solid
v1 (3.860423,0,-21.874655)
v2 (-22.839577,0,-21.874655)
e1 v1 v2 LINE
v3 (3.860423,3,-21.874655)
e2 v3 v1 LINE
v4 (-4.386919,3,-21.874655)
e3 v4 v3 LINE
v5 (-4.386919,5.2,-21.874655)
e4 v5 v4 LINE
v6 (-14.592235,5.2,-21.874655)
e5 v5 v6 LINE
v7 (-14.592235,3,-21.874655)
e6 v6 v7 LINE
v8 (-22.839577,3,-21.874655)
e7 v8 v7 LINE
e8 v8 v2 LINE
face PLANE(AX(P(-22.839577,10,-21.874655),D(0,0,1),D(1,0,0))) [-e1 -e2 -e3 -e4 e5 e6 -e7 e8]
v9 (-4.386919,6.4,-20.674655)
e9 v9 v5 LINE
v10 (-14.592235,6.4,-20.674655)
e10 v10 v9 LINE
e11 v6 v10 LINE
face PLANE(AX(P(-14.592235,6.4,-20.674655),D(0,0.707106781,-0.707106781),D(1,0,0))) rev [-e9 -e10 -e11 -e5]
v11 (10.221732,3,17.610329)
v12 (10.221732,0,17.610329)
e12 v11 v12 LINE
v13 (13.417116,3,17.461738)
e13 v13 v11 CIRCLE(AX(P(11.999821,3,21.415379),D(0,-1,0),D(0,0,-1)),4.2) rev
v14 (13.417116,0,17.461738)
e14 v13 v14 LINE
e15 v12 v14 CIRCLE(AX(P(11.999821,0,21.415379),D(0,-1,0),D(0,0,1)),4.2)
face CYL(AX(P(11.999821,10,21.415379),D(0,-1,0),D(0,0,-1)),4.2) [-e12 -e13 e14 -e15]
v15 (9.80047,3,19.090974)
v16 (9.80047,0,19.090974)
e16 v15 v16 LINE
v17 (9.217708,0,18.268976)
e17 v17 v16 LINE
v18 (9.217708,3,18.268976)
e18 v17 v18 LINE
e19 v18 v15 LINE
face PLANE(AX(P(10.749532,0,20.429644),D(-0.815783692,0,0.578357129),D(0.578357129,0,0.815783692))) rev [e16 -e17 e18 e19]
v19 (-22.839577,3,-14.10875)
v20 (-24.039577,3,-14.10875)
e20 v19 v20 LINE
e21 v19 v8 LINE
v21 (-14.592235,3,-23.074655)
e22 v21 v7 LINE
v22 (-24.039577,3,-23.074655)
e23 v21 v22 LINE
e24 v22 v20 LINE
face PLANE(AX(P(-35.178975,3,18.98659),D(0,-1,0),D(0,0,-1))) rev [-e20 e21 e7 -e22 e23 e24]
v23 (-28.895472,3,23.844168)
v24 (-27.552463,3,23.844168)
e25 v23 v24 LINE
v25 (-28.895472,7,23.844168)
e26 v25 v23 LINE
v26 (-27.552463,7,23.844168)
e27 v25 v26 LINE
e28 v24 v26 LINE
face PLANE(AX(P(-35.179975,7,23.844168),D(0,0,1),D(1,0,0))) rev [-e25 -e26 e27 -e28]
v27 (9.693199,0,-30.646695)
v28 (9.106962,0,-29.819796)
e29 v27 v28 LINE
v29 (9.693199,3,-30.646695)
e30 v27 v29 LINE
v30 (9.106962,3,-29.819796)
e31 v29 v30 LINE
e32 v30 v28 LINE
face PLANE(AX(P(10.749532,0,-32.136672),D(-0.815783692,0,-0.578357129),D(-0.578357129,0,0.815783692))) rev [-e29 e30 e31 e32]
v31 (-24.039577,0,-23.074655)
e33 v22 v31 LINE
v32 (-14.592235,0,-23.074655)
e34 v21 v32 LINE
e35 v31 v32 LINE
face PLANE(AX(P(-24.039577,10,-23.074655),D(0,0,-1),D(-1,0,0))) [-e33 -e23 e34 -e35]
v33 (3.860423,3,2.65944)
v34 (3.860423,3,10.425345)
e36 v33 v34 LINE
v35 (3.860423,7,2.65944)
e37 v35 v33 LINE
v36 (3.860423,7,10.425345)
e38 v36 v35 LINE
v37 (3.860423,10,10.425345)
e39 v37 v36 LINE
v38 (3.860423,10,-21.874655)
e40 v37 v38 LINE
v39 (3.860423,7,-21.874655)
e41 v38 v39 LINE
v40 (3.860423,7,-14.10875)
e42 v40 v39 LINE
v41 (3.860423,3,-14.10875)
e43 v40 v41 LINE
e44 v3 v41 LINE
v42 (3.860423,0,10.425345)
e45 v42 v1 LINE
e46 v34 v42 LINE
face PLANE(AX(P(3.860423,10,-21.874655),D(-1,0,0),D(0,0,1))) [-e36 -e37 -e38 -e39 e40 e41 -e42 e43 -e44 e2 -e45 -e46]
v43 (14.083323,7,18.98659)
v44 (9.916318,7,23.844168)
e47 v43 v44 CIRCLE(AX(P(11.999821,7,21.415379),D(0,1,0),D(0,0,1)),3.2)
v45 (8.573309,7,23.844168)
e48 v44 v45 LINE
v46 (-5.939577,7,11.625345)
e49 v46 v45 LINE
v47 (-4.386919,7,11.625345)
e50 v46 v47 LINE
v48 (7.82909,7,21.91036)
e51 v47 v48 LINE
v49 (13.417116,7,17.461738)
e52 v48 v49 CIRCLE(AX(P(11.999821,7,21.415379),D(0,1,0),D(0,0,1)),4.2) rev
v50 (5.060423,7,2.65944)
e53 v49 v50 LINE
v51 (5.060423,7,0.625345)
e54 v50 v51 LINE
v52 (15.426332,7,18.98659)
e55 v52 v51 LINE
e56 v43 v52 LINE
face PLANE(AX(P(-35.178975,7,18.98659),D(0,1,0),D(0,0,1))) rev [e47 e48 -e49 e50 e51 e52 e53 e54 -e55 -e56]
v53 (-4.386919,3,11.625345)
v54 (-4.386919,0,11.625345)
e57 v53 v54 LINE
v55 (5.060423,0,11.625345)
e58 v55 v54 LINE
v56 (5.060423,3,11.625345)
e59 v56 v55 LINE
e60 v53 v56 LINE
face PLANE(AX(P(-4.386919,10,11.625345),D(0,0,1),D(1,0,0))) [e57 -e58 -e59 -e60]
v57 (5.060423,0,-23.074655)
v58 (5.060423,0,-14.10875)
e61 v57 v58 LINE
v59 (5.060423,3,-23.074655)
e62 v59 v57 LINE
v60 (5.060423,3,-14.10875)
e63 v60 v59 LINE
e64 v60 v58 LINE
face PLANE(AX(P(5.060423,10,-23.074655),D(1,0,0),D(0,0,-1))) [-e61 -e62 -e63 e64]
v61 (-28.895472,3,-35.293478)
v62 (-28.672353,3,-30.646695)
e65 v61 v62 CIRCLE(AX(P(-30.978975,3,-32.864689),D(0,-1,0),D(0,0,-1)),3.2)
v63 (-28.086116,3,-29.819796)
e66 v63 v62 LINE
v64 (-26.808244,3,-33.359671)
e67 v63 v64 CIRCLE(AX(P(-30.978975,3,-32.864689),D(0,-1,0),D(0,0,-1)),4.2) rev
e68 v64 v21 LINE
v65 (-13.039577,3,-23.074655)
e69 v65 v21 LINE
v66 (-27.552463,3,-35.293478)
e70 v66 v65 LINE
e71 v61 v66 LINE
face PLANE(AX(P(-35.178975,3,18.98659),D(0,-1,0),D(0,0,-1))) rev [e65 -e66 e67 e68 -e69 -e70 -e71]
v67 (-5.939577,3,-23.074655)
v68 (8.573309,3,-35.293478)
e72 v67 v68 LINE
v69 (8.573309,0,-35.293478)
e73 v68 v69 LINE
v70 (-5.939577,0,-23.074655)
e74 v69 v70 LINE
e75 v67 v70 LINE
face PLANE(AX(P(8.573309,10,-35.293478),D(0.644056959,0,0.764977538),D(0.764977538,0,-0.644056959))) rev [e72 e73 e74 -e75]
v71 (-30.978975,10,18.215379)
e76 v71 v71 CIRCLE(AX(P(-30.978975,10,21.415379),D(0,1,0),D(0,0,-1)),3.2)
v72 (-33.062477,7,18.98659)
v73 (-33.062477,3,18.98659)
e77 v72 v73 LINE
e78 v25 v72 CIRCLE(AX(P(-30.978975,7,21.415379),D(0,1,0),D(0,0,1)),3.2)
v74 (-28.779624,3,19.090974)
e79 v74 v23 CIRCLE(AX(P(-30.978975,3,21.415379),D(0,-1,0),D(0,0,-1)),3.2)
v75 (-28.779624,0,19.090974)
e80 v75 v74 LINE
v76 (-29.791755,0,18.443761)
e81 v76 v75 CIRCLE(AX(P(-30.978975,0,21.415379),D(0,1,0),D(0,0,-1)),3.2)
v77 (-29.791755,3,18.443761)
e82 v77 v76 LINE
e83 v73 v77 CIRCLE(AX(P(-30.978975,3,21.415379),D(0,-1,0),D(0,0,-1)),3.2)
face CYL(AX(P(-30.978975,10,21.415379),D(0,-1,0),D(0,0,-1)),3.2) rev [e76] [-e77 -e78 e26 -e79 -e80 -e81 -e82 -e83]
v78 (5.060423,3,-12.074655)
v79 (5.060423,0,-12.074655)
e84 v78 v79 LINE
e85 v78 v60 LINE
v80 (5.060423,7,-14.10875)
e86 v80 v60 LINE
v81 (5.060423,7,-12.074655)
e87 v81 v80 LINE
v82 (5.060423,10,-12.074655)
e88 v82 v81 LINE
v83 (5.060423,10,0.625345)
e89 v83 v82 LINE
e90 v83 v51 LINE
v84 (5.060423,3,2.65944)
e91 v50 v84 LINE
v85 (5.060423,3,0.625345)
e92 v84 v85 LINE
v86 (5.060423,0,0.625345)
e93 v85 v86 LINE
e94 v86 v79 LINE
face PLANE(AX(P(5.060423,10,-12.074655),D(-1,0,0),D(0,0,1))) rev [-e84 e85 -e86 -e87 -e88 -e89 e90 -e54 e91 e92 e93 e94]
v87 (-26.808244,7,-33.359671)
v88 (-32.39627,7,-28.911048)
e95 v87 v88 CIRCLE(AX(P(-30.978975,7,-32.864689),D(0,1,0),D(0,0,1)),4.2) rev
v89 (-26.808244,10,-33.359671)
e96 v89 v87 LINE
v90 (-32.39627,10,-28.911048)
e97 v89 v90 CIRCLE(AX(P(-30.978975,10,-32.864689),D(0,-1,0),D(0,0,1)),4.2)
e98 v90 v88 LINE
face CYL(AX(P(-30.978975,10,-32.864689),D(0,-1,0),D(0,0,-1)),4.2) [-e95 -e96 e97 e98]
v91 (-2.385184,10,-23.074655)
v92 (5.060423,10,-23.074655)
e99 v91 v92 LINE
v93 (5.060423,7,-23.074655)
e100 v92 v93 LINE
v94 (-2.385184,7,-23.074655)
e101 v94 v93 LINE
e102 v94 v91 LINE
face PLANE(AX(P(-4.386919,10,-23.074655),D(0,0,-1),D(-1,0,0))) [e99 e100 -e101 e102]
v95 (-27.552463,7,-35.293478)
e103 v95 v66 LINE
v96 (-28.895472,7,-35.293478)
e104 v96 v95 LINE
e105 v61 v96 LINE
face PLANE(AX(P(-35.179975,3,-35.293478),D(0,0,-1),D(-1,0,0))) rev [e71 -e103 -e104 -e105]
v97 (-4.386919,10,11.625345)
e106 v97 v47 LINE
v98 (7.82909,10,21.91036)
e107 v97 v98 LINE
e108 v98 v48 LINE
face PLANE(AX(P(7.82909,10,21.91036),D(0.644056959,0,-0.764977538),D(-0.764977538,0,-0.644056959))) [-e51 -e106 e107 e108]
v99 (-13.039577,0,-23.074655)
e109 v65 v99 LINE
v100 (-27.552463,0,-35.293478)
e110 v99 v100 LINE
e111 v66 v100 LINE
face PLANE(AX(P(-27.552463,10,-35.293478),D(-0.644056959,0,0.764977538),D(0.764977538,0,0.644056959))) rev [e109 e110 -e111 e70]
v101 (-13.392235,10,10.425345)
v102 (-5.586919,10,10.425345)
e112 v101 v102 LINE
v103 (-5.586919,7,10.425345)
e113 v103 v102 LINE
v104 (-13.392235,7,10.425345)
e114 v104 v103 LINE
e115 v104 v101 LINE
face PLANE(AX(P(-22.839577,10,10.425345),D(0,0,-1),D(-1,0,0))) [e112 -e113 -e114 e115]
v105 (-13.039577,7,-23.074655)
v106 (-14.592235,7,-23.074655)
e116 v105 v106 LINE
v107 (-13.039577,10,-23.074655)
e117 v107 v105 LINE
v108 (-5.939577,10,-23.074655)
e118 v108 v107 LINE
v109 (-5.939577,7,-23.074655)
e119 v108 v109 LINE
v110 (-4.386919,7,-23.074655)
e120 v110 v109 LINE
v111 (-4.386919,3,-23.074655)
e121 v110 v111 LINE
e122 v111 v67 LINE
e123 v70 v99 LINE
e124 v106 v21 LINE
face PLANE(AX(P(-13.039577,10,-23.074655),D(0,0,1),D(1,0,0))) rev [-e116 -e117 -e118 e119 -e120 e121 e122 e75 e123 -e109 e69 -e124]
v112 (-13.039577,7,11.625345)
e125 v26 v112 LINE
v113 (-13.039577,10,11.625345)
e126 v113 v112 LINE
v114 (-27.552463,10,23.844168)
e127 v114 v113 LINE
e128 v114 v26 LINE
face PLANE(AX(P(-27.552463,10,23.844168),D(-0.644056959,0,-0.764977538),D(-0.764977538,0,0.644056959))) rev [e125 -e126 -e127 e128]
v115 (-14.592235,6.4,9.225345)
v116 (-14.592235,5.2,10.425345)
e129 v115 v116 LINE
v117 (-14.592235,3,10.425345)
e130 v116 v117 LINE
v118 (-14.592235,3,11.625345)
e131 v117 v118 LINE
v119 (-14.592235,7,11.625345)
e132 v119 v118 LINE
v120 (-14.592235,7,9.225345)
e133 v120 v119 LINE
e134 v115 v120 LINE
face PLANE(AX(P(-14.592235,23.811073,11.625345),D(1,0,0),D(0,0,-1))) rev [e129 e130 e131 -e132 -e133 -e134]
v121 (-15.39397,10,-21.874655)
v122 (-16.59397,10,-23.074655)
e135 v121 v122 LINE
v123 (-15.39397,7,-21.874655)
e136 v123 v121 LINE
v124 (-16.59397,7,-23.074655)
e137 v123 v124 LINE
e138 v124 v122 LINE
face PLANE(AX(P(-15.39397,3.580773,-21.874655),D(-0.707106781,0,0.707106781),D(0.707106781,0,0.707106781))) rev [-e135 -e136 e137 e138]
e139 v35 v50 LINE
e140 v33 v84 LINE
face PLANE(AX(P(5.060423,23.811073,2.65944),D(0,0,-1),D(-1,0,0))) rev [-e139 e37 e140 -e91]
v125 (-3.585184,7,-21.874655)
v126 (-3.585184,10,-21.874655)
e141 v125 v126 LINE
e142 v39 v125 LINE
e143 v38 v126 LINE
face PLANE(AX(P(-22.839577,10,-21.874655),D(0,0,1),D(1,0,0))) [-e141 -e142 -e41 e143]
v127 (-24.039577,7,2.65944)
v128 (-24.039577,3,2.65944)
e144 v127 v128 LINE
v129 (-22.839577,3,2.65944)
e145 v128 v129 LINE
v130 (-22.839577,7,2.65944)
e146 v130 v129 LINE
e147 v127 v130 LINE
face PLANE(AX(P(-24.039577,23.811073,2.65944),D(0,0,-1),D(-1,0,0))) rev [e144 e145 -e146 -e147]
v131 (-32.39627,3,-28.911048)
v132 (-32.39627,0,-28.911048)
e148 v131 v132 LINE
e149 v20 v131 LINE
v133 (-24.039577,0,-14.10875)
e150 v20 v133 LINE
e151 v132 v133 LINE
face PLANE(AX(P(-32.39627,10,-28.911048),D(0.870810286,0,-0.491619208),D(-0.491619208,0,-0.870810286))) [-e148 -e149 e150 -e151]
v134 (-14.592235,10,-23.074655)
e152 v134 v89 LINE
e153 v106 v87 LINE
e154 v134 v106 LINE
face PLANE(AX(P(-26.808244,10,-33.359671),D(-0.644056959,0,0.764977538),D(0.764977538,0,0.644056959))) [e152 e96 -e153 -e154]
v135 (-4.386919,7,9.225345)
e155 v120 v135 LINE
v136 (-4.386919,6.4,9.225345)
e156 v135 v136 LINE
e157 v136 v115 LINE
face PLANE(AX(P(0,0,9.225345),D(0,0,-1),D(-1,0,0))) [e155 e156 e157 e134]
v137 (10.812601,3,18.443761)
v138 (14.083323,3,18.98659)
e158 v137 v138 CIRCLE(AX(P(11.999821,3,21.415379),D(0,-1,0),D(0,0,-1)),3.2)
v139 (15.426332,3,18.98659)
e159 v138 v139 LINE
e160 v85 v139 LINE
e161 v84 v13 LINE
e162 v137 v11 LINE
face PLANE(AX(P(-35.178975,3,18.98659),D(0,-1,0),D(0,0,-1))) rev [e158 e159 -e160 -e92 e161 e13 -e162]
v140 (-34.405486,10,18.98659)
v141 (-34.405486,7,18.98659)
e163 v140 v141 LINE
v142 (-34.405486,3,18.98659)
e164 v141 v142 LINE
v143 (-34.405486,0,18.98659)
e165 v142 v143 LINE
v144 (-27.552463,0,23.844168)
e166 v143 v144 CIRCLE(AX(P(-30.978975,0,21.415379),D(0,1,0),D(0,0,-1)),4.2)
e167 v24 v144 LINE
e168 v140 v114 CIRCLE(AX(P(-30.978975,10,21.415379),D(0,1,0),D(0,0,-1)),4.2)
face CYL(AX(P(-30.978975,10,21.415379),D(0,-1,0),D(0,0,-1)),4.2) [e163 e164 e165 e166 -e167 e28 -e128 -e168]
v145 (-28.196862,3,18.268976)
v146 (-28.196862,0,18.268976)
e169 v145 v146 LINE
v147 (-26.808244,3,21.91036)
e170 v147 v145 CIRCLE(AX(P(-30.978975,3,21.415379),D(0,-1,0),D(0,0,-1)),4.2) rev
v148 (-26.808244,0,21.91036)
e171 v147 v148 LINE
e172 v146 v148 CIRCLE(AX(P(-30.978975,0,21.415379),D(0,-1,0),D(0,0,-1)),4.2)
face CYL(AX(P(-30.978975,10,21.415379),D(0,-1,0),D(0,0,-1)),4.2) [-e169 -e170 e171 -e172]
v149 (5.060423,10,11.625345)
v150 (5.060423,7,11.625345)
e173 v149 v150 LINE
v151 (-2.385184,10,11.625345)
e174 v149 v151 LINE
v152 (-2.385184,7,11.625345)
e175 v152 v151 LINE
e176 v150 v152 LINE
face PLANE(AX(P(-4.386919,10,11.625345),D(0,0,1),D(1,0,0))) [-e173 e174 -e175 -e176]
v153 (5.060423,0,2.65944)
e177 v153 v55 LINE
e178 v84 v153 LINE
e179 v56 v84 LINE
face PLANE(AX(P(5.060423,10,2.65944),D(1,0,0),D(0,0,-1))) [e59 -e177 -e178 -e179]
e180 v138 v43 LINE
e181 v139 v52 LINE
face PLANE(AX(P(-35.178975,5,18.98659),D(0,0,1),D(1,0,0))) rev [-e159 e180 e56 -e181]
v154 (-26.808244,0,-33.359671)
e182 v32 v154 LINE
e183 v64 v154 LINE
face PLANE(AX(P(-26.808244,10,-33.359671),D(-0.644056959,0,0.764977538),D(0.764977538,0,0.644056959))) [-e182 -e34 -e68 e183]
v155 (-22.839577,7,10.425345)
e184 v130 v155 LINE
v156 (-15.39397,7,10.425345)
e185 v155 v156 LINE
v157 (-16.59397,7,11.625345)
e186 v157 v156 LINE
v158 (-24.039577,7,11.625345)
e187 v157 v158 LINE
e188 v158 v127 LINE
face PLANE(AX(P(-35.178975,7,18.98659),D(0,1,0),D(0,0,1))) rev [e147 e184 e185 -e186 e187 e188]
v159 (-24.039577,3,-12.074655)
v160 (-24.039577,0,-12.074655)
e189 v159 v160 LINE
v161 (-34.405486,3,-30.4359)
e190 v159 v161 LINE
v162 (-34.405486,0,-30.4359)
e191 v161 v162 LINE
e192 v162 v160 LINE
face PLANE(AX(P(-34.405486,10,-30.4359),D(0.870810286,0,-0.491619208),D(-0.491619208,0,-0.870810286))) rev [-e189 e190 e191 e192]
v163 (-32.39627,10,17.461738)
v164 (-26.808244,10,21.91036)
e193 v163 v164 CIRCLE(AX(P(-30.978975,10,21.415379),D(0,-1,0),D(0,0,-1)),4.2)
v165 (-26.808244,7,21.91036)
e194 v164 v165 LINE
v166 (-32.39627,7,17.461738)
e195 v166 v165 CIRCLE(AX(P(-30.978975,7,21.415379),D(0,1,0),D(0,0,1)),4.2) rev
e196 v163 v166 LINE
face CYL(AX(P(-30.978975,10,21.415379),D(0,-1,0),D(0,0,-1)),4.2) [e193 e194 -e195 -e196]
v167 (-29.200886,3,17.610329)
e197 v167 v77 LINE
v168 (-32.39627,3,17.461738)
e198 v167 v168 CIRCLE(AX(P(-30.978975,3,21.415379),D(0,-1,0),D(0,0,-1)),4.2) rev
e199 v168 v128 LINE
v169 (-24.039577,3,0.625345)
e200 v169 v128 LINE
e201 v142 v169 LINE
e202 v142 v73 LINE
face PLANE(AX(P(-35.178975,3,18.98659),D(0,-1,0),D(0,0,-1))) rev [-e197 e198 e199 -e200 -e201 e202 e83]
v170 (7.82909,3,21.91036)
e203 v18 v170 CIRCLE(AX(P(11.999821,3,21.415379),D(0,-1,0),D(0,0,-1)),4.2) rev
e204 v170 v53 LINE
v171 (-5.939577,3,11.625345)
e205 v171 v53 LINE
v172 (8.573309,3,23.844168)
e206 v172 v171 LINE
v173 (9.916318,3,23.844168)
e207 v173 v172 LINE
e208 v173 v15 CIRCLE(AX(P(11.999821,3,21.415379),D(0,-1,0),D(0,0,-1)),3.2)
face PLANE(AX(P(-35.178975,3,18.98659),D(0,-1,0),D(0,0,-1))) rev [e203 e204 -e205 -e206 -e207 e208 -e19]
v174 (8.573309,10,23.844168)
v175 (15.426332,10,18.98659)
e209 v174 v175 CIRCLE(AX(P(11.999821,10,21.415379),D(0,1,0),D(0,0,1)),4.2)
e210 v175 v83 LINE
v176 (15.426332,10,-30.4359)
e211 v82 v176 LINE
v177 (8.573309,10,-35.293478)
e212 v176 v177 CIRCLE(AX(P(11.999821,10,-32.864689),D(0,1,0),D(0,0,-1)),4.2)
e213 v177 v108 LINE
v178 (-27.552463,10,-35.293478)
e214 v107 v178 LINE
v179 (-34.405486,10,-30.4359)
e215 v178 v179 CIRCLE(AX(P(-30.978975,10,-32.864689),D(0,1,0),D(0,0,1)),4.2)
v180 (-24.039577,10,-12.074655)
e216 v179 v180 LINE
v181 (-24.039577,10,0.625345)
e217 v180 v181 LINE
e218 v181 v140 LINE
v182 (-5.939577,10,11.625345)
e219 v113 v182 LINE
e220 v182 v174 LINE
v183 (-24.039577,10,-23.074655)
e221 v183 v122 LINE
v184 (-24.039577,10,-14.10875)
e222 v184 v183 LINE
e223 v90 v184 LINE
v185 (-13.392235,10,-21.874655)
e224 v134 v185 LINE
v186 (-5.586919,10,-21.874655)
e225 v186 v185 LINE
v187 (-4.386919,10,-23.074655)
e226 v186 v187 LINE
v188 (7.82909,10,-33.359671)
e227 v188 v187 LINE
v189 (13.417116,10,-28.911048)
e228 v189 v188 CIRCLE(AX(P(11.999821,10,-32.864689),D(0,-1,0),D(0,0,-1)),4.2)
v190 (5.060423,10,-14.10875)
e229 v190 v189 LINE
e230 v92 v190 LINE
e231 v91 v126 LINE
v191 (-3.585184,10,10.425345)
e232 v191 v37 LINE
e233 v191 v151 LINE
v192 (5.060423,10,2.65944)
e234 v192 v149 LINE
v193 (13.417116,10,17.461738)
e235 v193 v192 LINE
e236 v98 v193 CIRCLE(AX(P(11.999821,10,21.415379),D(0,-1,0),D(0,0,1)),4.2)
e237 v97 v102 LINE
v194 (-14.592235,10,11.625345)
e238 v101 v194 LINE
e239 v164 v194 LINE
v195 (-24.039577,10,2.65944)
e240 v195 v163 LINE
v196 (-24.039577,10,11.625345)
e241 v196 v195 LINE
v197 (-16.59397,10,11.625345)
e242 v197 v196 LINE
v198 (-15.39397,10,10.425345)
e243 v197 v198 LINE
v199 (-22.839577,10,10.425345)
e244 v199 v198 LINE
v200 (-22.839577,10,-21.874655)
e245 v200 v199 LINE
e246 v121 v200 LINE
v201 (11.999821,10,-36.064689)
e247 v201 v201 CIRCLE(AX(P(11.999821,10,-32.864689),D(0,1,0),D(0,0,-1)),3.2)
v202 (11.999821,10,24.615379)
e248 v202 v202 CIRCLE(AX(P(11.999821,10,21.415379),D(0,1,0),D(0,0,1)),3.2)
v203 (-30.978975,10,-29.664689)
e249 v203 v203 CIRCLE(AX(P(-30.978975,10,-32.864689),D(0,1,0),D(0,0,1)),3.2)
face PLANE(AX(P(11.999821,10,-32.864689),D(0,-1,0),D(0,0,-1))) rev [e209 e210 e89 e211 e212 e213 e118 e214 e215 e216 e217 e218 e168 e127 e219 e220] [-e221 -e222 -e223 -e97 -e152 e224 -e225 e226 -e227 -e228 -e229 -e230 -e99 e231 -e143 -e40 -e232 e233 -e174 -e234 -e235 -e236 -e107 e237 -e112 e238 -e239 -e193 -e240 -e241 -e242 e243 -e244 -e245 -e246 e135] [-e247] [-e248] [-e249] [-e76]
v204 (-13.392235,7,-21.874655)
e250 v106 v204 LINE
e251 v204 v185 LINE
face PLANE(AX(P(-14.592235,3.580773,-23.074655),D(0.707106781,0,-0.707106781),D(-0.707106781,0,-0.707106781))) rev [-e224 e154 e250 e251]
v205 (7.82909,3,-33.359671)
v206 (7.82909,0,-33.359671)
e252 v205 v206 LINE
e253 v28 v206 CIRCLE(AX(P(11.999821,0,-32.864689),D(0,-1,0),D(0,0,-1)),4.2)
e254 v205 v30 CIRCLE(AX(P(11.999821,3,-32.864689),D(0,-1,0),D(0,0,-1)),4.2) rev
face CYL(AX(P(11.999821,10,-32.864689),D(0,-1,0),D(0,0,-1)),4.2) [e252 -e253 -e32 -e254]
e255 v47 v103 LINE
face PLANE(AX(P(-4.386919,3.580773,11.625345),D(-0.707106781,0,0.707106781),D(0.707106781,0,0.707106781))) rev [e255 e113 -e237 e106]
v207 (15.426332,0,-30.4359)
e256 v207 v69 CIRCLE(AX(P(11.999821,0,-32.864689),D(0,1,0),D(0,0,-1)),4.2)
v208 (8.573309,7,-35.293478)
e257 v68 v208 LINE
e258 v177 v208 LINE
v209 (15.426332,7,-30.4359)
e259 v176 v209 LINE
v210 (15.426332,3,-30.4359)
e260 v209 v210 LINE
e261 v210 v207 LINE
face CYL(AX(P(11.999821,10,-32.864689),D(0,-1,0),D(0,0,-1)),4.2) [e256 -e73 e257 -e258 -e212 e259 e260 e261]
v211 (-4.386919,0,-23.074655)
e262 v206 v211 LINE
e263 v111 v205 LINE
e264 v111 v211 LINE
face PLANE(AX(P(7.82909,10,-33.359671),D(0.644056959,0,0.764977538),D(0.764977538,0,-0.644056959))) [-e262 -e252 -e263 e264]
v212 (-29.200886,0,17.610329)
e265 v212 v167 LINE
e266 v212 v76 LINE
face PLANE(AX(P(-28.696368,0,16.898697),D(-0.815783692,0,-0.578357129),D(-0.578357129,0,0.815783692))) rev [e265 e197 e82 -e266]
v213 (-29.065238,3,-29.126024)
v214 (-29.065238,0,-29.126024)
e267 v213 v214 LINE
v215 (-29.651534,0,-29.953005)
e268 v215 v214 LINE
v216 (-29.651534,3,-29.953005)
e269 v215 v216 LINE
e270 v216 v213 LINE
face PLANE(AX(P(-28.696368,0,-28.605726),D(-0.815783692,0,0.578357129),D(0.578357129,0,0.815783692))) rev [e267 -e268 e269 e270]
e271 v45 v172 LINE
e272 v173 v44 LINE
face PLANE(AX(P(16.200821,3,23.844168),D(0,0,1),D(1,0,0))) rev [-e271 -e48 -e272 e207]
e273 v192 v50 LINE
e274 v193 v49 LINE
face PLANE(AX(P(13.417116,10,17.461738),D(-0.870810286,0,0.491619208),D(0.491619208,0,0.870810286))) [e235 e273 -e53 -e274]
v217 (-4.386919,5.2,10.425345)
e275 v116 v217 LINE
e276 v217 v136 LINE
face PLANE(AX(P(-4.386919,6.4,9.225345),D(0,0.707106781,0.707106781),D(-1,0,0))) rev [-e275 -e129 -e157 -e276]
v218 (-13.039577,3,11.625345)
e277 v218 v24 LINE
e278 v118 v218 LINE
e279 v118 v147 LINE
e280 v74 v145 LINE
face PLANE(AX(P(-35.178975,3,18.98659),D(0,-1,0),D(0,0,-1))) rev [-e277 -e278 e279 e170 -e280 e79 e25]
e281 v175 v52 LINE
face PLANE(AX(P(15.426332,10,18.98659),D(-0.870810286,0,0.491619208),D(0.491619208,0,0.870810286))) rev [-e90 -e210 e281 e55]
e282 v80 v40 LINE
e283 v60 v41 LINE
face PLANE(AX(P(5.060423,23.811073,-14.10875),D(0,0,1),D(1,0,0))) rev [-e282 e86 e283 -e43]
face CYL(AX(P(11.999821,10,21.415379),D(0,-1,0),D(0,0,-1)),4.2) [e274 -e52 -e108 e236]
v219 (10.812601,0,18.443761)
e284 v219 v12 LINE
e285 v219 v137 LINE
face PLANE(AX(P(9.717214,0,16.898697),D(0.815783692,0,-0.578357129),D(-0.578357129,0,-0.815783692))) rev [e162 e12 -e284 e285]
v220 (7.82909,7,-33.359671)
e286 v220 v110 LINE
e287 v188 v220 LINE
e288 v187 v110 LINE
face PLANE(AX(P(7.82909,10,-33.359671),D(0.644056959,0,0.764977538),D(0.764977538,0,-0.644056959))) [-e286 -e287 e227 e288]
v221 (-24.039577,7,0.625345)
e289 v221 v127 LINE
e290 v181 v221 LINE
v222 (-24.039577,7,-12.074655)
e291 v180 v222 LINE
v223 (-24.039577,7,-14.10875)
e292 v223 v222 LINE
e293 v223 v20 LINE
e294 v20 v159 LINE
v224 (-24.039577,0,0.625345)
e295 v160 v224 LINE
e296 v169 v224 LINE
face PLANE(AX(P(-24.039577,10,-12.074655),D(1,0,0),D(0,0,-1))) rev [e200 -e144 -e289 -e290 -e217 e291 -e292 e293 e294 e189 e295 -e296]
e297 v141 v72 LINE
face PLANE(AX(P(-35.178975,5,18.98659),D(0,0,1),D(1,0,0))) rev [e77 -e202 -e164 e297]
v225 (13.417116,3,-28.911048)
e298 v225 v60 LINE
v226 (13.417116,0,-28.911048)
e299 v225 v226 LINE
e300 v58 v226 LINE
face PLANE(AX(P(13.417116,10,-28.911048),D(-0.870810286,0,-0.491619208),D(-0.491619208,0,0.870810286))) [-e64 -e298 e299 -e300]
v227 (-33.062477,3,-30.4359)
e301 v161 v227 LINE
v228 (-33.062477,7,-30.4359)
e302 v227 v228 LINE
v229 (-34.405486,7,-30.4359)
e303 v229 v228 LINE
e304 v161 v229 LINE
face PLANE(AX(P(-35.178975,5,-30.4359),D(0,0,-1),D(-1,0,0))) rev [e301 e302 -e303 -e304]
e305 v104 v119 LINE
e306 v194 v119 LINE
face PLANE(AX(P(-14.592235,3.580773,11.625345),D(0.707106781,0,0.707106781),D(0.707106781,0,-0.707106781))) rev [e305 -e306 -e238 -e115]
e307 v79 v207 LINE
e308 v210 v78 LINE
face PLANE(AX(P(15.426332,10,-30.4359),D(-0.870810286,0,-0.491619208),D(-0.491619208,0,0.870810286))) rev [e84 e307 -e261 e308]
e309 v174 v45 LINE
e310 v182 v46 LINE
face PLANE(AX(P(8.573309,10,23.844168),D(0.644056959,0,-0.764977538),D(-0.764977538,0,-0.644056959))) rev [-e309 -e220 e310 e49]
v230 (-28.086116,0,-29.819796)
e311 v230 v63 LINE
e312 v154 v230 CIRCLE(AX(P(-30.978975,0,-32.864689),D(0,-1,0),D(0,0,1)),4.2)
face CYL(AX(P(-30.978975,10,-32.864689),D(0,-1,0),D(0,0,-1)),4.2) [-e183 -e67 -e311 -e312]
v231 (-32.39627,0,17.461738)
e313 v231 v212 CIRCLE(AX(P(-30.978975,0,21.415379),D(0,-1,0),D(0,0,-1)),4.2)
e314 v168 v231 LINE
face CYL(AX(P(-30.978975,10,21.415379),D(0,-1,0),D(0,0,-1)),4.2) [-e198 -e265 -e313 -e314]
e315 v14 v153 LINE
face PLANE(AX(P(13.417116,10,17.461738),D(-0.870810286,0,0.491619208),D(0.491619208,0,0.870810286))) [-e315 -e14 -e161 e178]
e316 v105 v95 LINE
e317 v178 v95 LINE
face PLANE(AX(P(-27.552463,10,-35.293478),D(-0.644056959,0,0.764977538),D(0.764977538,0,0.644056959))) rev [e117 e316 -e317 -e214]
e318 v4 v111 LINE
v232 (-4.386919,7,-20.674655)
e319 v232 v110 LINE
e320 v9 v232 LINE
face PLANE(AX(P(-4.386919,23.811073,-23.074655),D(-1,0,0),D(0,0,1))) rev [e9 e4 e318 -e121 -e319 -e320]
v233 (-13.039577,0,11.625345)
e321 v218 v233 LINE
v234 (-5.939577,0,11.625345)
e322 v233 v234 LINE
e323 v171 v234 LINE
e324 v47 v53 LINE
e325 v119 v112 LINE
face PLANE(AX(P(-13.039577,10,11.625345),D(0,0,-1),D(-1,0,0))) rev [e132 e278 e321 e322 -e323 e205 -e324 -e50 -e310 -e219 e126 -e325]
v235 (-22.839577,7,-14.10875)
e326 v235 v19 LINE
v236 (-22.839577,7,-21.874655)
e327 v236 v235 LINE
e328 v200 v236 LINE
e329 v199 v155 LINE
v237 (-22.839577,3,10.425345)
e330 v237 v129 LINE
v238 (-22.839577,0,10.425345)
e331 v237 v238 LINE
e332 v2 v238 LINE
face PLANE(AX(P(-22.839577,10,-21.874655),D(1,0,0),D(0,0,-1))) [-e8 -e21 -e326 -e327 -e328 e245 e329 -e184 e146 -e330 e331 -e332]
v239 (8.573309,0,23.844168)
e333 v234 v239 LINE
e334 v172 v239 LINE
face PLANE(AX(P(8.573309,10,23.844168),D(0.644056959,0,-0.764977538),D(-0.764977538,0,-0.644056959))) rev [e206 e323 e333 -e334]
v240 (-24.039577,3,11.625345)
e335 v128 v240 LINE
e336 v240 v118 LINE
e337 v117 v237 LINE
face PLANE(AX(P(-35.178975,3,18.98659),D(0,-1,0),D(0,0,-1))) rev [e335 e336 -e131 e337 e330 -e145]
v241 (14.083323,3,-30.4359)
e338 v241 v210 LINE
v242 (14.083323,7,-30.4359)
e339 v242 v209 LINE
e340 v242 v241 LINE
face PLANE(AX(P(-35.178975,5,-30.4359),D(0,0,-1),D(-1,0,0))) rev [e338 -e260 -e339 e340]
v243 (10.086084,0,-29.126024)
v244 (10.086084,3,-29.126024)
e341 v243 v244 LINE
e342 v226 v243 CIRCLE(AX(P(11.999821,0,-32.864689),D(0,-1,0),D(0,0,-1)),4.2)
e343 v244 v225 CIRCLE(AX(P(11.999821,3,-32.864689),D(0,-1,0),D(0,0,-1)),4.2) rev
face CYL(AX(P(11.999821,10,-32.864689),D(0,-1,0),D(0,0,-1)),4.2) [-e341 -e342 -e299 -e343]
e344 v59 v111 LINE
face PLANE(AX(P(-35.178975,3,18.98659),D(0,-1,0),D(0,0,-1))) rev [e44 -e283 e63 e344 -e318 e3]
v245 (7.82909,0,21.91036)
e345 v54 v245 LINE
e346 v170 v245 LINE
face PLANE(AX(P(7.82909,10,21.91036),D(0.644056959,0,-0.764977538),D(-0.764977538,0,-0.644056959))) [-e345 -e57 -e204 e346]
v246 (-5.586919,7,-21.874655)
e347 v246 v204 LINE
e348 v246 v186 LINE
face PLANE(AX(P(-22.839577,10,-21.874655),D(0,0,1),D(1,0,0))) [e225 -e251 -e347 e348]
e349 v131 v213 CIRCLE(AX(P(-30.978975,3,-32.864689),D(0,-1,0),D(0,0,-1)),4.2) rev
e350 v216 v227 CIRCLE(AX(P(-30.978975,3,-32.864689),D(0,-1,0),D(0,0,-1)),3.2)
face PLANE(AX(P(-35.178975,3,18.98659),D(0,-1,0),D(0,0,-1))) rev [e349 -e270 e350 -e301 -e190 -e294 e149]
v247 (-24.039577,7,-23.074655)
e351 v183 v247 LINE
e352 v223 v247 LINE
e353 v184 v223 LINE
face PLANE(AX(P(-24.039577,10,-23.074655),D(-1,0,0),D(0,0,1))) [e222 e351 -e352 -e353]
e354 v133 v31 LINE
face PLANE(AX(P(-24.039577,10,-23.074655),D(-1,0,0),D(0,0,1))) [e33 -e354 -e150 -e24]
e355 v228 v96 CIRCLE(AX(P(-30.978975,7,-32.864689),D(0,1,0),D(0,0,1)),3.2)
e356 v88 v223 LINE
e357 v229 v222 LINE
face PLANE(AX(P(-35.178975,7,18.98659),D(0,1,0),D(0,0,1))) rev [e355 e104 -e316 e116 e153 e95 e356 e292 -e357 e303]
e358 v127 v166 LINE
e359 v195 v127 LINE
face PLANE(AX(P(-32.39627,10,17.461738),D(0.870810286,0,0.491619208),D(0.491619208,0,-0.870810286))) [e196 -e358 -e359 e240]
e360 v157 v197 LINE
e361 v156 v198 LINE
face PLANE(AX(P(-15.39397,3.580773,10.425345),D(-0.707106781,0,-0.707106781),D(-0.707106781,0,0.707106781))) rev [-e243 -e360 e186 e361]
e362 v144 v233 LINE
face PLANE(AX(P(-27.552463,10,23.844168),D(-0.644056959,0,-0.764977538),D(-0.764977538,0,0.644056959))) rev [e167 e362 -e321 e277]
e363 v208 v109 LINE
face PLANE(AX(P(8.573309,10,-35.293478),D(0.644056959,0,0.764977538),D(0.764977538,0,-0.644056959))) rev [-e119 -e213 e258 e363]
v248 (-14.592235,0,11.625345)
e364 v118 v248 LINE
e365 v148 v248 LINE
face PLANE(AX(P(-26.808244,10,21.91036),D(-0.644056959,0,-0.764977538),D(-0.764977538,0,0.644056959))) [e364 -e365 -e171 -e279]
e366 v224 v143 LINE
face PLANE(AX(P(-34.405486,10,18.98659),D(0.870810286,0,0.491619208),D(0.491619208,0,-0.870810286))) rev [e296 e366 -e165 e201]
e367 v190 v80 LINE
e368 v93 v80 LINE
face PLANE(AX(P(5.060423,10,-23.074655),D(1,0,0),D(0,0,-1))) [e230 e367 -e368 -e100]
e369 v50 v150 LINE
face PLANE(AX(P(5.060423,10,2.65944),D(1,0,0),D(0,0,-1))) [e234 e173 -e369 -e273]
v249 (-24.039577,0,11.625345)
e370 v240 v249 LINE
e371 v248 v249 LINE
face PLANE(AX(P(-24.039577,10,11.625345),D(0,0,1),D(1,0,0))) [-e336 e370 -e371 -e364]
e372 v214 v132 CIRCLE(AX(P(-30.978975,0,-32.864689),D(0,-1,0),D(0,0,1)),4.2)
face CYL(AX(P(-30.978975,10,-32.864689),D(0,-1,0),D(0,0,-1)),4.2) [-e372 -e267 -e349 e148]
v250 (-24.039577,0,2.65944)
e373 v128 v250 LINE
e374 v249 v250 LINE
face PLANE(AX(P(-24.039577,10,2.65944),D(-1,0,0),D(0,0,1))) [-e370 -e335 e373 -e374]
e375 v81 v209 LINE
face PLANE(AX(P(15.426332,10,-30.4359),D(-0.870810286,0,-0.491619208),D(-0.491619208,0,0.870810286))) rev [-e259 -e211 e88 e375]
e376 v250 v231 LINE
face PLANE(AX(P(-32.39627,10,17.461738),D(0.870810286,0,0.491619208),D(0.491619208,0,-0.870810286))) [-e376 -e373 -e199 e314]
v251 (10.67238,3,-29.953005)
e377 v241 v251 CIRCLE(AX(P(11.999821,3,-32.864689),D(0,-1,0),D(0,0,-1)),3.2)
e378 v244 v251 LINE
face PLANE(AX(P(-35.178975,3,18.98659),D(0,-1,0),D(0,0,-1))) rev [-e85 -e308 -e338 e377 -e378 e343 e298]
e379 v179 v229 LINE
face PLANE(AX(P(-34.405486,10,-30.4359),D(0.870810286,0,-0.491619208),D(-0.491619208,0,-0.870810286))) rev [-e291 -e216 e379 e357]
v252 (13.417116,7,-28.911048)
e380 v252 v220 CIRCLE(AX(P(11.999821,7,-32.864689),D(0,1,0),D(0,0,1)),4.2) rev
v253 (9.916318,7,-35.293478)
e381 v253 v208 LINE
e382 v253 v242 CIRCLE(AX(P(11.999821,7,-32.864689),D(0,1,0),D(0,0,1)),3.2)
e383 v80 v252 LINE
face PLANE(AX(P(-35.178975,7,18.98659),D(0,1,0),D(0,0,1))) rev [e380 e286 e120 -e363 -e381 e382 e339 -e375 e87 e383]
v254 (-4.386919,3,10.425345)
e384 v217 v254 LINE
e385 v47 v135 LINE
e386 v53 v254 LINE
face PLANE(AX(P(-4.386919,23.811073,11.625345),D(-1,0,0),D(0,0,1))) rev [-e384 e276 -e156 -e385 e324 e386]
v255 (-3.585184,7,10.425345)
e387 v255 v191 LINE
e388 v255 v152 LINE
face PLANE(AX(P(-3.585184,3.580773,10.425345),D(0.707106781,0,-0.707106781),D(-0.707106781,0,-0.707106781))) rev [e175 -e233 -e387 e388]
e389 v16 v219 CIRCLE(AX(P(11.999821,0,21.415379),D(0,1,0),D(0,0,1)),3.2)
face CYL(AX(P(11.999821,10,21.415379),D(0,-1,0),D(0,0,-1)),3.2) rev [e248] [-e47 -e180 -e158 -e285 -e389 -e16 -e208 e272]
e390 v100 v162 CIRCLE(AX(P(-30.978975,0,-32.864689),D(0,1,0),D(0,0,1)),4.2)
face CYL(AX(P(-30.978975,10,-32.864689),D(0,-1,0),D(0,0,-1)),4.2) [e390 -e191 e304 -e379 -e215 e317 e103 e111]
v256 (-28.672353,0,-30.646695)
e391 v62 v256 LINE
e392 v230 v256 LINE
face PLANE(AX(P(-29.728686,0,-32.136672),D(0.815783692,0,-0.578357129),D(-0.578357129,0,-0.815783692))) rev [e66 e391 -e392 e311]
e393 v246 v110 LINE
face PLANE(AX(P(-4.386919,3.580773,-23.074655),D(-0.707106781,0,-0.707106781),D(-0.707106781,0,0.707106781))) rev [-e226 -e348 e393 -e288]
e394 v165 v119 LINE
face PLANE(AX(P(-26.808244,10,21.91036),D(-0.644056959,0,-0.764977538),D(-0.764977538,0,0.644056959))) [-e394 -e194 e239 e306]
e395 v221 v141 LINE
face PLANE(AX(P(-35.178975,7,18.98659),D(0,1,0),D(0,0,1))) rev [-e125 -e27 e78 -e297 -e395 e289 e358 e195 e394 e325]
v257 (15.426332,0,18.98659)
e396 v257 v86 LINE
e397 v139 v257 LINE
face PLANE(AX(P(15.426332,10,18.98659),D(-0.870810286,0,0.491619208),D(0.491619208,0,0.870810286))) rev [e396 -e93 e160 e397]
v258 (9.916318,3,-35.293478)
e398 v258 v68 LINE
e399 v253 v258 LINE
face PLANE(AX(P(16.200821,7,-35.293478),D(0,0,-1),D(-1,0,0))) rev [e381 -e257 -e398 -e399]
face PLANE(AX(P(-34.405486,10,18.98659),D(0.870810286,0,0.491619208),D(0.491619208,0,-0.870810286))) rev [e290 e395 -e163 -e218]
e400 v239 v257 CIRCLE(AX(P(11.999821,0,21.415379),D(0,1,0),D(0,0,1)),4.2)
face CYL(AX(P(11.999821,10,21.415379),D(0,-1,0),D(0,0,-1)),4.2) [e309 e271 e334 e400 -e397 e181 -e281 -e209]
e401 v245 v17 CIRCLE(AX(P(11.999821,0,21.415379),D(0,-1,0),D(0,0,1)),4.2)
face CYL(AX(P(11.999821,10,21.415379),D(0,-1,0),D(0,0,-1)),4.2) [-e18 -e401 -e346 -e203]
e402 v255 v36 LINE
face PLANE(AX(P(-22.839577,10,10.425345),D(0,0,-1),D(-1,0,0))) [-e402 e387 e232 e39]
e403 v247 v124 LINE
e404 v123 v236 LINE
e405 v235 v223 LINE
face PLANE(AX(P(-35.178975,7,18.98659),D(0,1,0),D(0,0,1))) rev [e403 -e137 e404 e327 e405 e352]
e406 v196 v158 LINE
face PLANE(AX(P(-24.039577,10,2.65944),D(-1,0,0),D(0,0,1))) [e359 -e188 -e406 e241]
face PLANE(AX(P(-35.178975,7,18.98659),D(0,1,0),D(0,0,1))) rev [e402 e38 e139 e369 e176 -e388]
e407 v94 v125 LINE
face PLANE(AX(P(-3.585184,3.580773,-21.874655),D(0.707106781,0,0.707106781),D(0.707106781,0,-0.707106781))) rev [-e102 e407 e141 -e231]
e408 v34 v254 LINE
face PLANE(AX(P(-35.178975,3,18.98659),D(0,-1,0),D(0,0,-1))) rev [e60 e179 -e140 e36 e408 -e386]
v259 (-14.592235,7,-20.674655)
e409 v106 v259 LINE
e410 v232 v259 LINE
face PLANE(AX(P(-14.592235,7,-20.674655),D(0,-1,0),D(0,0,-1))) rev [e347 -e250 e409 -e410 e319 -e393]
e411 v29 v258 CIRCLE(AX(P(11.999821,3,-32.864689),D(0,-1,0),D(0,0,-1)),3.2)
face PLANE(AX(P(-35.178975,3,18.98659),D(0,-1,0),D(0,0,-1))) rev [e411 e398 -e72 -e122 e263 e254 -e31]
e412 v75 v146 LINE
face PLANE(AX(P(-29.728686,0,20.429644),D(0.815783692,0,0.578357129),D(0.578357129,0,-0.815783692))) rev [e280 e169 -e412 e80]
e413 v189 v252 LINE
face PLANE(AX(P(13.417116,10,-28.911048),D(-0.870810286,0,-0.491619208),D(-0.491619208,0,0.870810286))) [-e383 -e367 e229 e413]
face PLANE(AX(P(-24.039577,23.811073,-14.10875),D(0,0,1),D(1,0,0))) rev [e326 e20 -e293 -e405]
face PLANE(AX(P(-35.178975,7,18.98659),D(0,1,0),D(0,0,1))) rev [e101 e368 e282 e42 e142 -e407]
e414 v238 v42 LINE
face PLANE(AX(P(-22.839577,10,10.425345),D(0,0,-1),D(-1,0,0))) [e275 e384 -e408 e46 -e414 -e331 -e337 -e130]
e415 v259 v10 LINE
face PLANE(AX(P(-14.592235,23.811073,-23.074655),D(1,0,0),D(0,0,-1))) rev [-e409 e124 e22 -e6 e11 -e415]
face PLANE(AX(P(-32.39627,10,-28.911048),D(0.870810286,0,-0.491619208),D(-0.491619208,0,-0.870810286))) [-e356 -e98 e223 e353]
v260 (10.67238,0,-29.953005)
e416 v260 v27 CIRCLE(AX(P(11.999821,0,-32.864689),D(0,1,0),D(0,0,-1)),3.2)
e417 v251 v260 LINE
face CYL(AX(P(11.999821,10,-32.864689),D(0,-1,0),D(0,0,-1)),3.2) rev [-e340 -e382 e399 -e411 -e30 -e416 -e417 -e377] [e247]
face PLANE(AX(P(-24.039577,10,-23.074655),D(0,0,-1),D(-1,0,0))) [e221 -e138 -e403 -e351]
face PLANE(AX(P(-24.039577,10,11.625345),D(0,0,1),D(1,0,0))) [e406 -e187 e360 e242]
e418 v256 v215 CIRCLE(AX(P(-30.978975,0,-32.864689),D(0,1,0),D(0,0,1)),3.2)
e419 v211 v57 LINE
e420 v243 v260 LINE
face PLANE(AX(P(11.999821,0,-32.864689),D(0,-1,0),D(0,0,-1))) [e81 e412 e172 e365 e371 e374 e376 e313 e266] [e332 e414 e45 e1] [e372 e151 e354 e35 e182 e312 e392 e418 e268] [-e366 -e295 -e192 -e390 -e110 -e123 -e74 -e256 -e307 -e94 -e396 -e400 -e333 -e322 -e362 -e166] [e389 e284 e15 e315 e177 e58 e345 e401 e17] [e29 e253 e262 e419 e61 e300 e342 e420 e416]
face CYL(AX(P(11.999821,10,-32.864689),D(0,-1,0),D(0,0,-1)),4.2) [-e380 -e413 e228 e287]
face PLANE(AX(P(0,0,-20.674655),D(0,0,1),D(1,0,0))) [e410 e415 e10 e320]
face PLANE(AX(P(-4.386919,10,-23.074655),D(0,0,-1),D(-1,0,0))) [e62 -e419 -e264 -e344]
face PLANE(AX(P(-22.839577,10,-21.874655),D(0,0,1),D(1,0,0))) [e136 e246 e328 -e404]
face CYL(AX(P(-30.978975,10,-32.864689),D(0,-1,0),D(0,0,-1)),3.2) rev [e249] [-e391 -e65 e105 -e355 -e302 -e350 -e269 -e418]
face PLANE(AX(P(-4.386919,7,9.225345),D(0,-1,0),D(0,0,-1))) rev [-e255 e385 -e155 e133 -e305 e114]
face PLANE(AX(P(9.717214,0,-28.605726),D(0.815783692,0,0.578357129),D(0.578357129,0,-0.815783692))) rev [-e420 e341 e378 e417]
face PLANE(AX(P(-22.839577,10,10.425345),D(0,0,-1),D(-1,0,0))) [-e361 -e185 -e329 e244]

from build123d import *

# Parameters (mm, degrees)
SKETCH1_R               = 3.2
SKETCH1_W               = 26.7
SKETCH1_H               = 32.3
BOSS_EXTRUDE2_DEPTH     = 10
CUT_EXTRUDE1_DEPTH      = 68.219866013
SKETCH3_W               = 36.125771517
SKETCH3_H               = 4
CUT_EXTRUDE2_DEPTH      = 77.38869507
CUT_EXTRUDE3_REACH      = 60.207
CUT_EXTRUDE3_END_RADIUS = 3.2
SKETCH4_W               = 4.857578305
SKETCH4_H               = 4
CUT_EXTRUDE4_REACH      = 60.207
CUT_EXTRUDE4_END_RADIUS = 3.2
SKETCH5_W               = 4.857578305
SKETCH5_H               = 4
CUT_EXTRUDE5_REACH      = 60.207
CUT_EXTRUDE5_END_RADIUS = 3.2
SKETCH6_W               = 4.857578305
SKETCH6_H               = 4
CUT_EXTRUDE6_REACH      = 60.207
CUT_EXTRUDE6_END_RADIUS = 3.2
SKETCH7_W               = 4.857578305
SKETCH7_H               = 4
SKETCH8_W               = 10.205315409
SKETCH8_H               = 1.2
SKETCH8_W_2             = 1.2
SKETCH8_H_2             = 16.7681893
BOSS_EXTRUDE3_DEPTH     = 4
CUT_EXTRUDE7_DEPTH      = 52.578594453
SKETCH10_W              = 10.205315409
SKETCH10_H              = 0.6
BOSS_EXTRUDE4_DEPTH     = 1.2
CHAMFER1_SIZE           = 1.2
SKETCH12_W              = 10.205315409
SKETCH12_H              = 0.6
BOSS_EXTRUDE5_DEPTH     = 1.2
CHAMFER2_SIZE           = 1.2
CUT_EXTRUDE8_DEPTH      = 53.070638614
CUT_EXTRUDE8_DEPTH_BACK = 3


with BuildPart() as part:
    # Sketch1 → Boss-Extrude2 (new body)
    with BuildSketch(Plane(origin=(0, 0, 0), x_dir=(1, 0, 0), z_dir=(0, 1, 0))):
        with BuildLine():
            Line((-34.405486348, 30.435899661), (-24.03957695, 12.074655042))
            Line((-24.03957695, 12.074655042), (-24.03957695, -0.625344958))
            Line((-24.03957695, -0.625344958), (-34.405486348, -18.986589577))
            ThreePointArc((-34.405486348, -18.986589577), (-33.407763681, -24.841890549), (-27.552462708, -23.844167882))
            Line((-27.552462708, -23.844167882), (-13.03957695, -11.625344958))
            Line((-13.03957695, -11.625344958), (-5.93957695, -11.625344958))
            Line((-5.93957695, -11.625344958), (8.573308809, -23.844167882))
            ThreePointArc((8.573308809, -23.844167882), (14.428609781, -24.841890549), (15.426332449, -18.986589577))
            Line((15.426332449, -18.986589577), (5.06042305, -0.625344958))
            Line((5.06042305, -0.625344958), (5.06042305, 12.074655042))
            Line((5.06042305, 12.074655042), (15.426332449, 30.435899661))
            ThreePointArc((15.426332449, 30.435899661), (14.428609781, 36.291200634), (8.573308809, 35.293477966))
            Line((8.573308809, 35.293477966), (-5.93957695, 23.074655042))
            Line((-5.93957695, 23.074655042), (-13.03957695, 23.074655042))
            Line((-13.03957695, 23.074655042), (-27.552462708, 35.293477966))
            ThreePointArc((-27.552462708, 35.293477966), (-33.407763681, 36.291200634), (-34.405486348, 30.435899661))
        make_face()
        with Locations(Location((-30.978974528, 32.864688814, 0), (0, 0, 270))):
            Circle(SKETCH1_R, mode=Mode.SUBTRACT)
        with Locations(Location((11.999820629, 32.864688814, 0), (0, 0, 90))):
            Circle(SKETCH1_R, mode=Mode.SUBTRACT)
        with Locations(Location((-30.978974528, -21.415378729, 0), (0, 0, 90))):
            Circle(SKETCH1_R, mode=Mode.SUBTRACT)
        with Locations(Location((11.999820629, -21.415378729, 0), (0, 0, 270))):
            Circle(SKETCH1_R, mode=Mode.SUBTRACT)
        with BuildLine():
            Line((-24.03957695, 23.074655042), (-14.592234654, 23.074655042))
            Line((-14.592234654, 23.074655042), (-26.808244007, 33.359670553))
            ThreePointArc((-26.808244007, 33.359670553), (-28.363078678, 29.578796408), (-32.396270044, 28.911048286))
            Line((-32.396270044, 28.911048286), (-24.03957695, 14.108749692))
            Line((-24.03957695, 14.108749692), (-24.03957695, 23.074655042))
        make_face(mode=Mode.SUBTRACT)
        with Locations((-9.48957695, 5.724655042)):
            Rectangle(SKETCH1_W, SKETCH1_H, mode=Mode.SUBTRACT)
        with BuildLine():
            Line((5.06042305, 23.074655042), (5.06042305, 14.108749692))
            Line((5.06042305, 14.108749692), (13.417116145, 28.911048286))
            ThreePointArc((13.417116145, 28.911048286), (9.383924779, 29.578796408), (7.829090108, 33.359670553))
            Line((7.829090108, 33.359670553), (-4.386919245, 23.074655042))
            Line((-4.386919245, 23.074655042), (5.06042305, 23.074655042))
        make_face(mode=Mode.SUBTRACT)
        with BuildLine():
            Line((-24.03957695, -11.625344958), (-14.592234654, -11.625344958))
            Line((-14.592234654, -11.625344958), (-26.808244007, -21.910360468))
            ThreePointArc((-26.808244007, -21.910360468), (-28.363078678, -18.129486324), (-32.396270044, -17.461738202))
            Line((-32.396270044, -17.461738202), (-24.03957695, -2.659439608))
            Line((-24.03957695, -2.659439608), (-24.03957695, -11.625344958))
        make_face(mode=Mode.SUBTRACT)
        with BuildLine():
            Line((7.829090108, -21.910360468), (-4.386919245, -11.625344958))
            Line((-4.386919245, -11.625344958), (5.06042305, -11.625344958))
            Line((5.06042305, -11.625344958), (5.06042305, -2.659439608))
            Line((5.06042305, -2.659439608), (13.417116145, -17.461738202))
            ThreePointArc((13.417116145, -17.461738202), (9.383924779, -18.129486324), (7.829090108, -21.910360468))
        make_face(mode=Mode.SUBTRACT)
    extrude(amount=BOSS_EXTRUDE2_DEPTH)

    # Sketch2 → Cut-Extrude1 (cut, through all)
    with BuildSketch(Plane(origin=(20, 0, 0), x_dir=(0, 0, -1), z_dir=(1, 0, 0))):
        Polygon((-18.986589577, 5), (-18.986589577, 7), (-0.625344958, 7), (-0.625344958, 5), (-0.625344958, 3), (-18.986589577, 3), align=None)
        Polygon((30.435899661, 7), (12.074655042, 7), (12.074655042, 5), (12.074655042, 3), (30.435899661, 3), (30.435899661, 5), align=None)
    extrude(amount=-CUT_EXTRUDE1_DEPTH, mode=Mode.SUBTRACT)

    # Sketch3 → Cut-Extrude2 (cut, through all)
    with BuildSketch(Plane.XY.offset(30)):
        with Locations((-9.489576949, 5)):
            Rectangle(SKETCH3_W, SKETCH3_H)
    extrude(amount=-CUT_EXTRUDE2_DEPTH, mode=Mode.SUBTRACT)

    # Cut-Extrude3: up to this cylinder (the profile starts outside it)
    cut_extrude3_end = Plane(origin=(-30.978974528, 5, 21.415378729), z_dir=(0, -1, 0)) * Cylinder(CUT_EXTRUDE3_END_RADIUS, 127.814, mode=Mode.PRIVATE)
    # Sketch4 → Cut-Extrude3 (cut, up to the surface)
    with BuildSketch(Plane(origin=(-27.552462708, 0, 0), x_dir=(0, 0, -1), z_dir=(1, 0, 0)), mode=Mode.PRIVATE) as cut_extrude3_sk1:
        with Locations((-21.415378729, 5)):
            Rectangle(SKETCH4_W, SKETCH4_H)
    cut_extrude3_tool1 = extrude(cut_extrude3_sk1.sketch, amount=-CUT_EXTRUDE3_REACH, mode=Mode.PRIVATE) - cut_extrude3_end
    add(cut_extrude3_tool1.solids().sort_by_distance((-27.552463, 5, 21.415379))[0], mode=Mode.SUBTRACT)

    # Cut-Extrude4: up to this cylinder (the profile starts outside it)
    cut_extrude4_end = Plane(origin=(11.999820629, 5, 21.415378729), z_dir=(0, -1, 0)) * Cylinder(CUT_EXTRUDE4_END_RADIUS, 127.814, mode=Mode.PRIVATE)
    # Sketch5 → Cut-Extrude4 (cut, up to the surface)
    with BuildSketch(Plane.ZY.offset(-8.573308809), mode=Mode.PRIVATE) as cut_extrude4_sk1:
        with Locations((21.415378729, 5)):
            Rectangle(SKETCH5_W, SKETCH5_H)
    cut_extrude4_tool1 = extrude(cut_extrude4_sk1.sketch, amount=-CUT_EXTRUDE4_REACH, mode=Mode.PRIVATE) - cut_extrude4_end
    add(cut_extrude4_tool1.solids().sort_by_distance((8.573309, 5, 21.415379))[0], mode=Mode.SUBTRACT)

    # Cut-Extrude5: up to this cylinder (the profile starts outside it)
    cut_extrude5_end = Plane(origin=(-30.978974528, 5, -32.864688814), z_dir=(0, -1, 0)) * Cylinder(CUT_EXTRUDE5_END_RADIUS, 127.814, mode=Mode.PRIVATE)
    # Sketch6 → Cut-Extrude5 (cut, up to the surface)
    with BuildSketch(Plane(origin=(-27.552462708, 0, 0), x_dir=(0, 0, -1), z_dir=(1, 0, 0)), mode=Mode.PRIVATE) as cut_extrude5_sk1:
        with Locations((32.864688814, 5)):
            Rectangle(SKETCH6_W, SKETCH6_H)
    cut_extrude5_tool1 = extrude(cut_extrude5_sk1.sketch, amount=-CUT_EXTRUDE5_REACH, mode=Mode.PRIVATE) - cut_extrude5_end
    add(cut_extrude5_tool1.solids().sort_by_distance((-27.552463, 5, -32.864689))[0], mode=Mode.SUBTRACT)

    # Cut-Extrude6: up to this cylinder (the profile starts outside it)
    cut_extrude6_end = Plane(origin=(11.999820629, 5, -32.864688814), z_dir=(0, -1, 0)) * Cylinder(CUT_EXTRUDE6_END_RADIUS, 127.814, mode=Mode.PRIVATE)
    # Sketch7 → Cut-Extrude6 (cut, up to the surface)
    with BuildSketch(Plane.ZY.offset(-8.573308809), mode=Mode.PRIVATE) as cut_extrude6_sk1:
        with Locations((-32.864688814, 5)):
            Rectangle(SKETCH7_W, SKETCH7_H)
    cut_extrude6_tool1 = extrude(cut_extrude6_sk1.sketch, amount=-CUT_EXTRUDE6_REACH, mode=Mode.PRIVATE) - cut_extrude6_end
    add(cut_extrude6_tool1.solids().sort_by_distance((8.573309, 5, -32.864689))[0], mode=Mode.SUBTRACT)

    # Sketch8 → Boss-Extrude3 (add)
    with BuildSketch(Plane(origin=(0, 3, 0), x_dir=(1, 0, 0), z_dir=(0, 1, 0))):
        with Locations((-9.489576949, 22.474655042)):
            Rectangle(SKETCH8_W, SKETCH8_H)
        with Locations((-9.489576949, -11.025344958)):
            Rectangle(SKETCH8_W, SKETCH8_H)
        with Locations((-23.43957695, 5.724655042)):
            Rectangle(SKETCH8_W_2, SKETCH8_H_2)
        with Locations((4.46042305, 5.724655042)):
            Rectangle(SKETCH8_W_2, SKETCH8_H_2)
    extrude(amount=BOSS_EXTRUDE3_DEPTH)

    # Sketch9 → Cut-Extrude7 (cut, through all)
    with BuildSketch(Plane(origin=(0, 3, 0), x_dir=(1, 0, 0), z_dir=(0, 1, 0))):
        Polygon((-27.717427746, 29.299754586), (-28.696368176, 28.605726031), (-30.707626394, 31.442643867), (-29.728685964, 32.136672421), align=None)
        Polygon((11.728472495, 31.442643867), (10.749532065, 32.136672421), (8.738273847, 29.299754586), (9.717214277, 28.605726031), align=None)
        Polygon((9.717214277, -16.898697434), (11.728472495, -19.735615269), (10.749532065, -20.429643824), (8.738273847, -17.592725989), align=None)
        Polygon((-30.707626394, -19.735615269), (-29.728685964, -20.429643824), (-27.717427746, -17.592725989), (-28.696368176, -16.898697434), align=None)
    extrude(amount=-CUT_EXTRUDE7_DEPTH, mode=Mode.SUBTRACT)

    # Sketch10 → Boss-Extrude4 (add)
    with BuildSketch(Plane.XY.offset(-21.874655042)):
        with Locations((-9.489576949, 6.7)):
            Rectangle(SKETCH10_W, SKETCH10_H)
    extrude(amount=BOSS_EXTRUDE4_DEPTH)

    # Chamfer1
    chamfer1_edges = [part.edges().sort_by_distance(p)[0] for p in [
        (-9.48957695, 6.4, -21.874655042),
    ]]
    chamfer(chamfer1_edges, length=CHAMFER1_SIZE - 0.0001)  # a hair under: the kernel refuses the full size

    # Sketch12 → Boss-Extrude5 (add)
    with BuildSketch(Plane(origin=(0, 0, 10.425344958), x_dir=(-1, 0, 0), z_dir=(0, 0, -1))):
        with Locations((9.489576949, 6.7)):
            Rectangle(SKETCH12_W, SKETCH12_H)
    extrude(amount=BOSS_EXTRUDE5_DEPTH)

    # Chamfer2
    chamfer2_edges = [part.edges().sort_by_distance(p)[0] for p in [
        (-9.48957695, 6.4, 10.425344958),
    ]]
    chamfer(chamfer2_edges, length=CHAMFER2_SIZE - 0.0001)  # a hair under: the kernel refuses the full size

    # Sketch13 → Cut-Extrude8 (cut, two sides: drawn at the far end of the back side and taken through both)
    with BuildSketch(Plane(origin=(0, 10, 0), x_dir=(1, 0, 0), z_dir=(0, 1, 0)).offset(-CUT_EXTRUDE8_DEPTH_BACK)):
        Polygon((-14.592234654, 23.074655042), (-13.392234654, 21.874655042), (-15.393970224, 21.874655042), (-16.593970224, 23.074655042), align=None)
        Polygon((-3.585183676, 21.874655042), (-2.385183676, 23.074655042), (-4.386919245, 23.074655042), (-5.586919245, 21.874655042), align=None)
        Polygon((-5.586919245, -10.425344958), (-3.585183676, -10.425344958), (-2.385183676, -11.625344958), (-4.386919245, -11.625344958), align=None)
        Polygon((-15.393970224, -10.425344958), (-16.593970224, -11.625344958), (-14.592234654, -11.625344958), (-13.392234654, -10.425344958), align=None)
    extrude(amount=CUT_EXTRUDE8_DEPTH + CUT_EXTRUDE8_DEPTH_BACK, mode=Mode.SUBTRACT)


solid = part.part
